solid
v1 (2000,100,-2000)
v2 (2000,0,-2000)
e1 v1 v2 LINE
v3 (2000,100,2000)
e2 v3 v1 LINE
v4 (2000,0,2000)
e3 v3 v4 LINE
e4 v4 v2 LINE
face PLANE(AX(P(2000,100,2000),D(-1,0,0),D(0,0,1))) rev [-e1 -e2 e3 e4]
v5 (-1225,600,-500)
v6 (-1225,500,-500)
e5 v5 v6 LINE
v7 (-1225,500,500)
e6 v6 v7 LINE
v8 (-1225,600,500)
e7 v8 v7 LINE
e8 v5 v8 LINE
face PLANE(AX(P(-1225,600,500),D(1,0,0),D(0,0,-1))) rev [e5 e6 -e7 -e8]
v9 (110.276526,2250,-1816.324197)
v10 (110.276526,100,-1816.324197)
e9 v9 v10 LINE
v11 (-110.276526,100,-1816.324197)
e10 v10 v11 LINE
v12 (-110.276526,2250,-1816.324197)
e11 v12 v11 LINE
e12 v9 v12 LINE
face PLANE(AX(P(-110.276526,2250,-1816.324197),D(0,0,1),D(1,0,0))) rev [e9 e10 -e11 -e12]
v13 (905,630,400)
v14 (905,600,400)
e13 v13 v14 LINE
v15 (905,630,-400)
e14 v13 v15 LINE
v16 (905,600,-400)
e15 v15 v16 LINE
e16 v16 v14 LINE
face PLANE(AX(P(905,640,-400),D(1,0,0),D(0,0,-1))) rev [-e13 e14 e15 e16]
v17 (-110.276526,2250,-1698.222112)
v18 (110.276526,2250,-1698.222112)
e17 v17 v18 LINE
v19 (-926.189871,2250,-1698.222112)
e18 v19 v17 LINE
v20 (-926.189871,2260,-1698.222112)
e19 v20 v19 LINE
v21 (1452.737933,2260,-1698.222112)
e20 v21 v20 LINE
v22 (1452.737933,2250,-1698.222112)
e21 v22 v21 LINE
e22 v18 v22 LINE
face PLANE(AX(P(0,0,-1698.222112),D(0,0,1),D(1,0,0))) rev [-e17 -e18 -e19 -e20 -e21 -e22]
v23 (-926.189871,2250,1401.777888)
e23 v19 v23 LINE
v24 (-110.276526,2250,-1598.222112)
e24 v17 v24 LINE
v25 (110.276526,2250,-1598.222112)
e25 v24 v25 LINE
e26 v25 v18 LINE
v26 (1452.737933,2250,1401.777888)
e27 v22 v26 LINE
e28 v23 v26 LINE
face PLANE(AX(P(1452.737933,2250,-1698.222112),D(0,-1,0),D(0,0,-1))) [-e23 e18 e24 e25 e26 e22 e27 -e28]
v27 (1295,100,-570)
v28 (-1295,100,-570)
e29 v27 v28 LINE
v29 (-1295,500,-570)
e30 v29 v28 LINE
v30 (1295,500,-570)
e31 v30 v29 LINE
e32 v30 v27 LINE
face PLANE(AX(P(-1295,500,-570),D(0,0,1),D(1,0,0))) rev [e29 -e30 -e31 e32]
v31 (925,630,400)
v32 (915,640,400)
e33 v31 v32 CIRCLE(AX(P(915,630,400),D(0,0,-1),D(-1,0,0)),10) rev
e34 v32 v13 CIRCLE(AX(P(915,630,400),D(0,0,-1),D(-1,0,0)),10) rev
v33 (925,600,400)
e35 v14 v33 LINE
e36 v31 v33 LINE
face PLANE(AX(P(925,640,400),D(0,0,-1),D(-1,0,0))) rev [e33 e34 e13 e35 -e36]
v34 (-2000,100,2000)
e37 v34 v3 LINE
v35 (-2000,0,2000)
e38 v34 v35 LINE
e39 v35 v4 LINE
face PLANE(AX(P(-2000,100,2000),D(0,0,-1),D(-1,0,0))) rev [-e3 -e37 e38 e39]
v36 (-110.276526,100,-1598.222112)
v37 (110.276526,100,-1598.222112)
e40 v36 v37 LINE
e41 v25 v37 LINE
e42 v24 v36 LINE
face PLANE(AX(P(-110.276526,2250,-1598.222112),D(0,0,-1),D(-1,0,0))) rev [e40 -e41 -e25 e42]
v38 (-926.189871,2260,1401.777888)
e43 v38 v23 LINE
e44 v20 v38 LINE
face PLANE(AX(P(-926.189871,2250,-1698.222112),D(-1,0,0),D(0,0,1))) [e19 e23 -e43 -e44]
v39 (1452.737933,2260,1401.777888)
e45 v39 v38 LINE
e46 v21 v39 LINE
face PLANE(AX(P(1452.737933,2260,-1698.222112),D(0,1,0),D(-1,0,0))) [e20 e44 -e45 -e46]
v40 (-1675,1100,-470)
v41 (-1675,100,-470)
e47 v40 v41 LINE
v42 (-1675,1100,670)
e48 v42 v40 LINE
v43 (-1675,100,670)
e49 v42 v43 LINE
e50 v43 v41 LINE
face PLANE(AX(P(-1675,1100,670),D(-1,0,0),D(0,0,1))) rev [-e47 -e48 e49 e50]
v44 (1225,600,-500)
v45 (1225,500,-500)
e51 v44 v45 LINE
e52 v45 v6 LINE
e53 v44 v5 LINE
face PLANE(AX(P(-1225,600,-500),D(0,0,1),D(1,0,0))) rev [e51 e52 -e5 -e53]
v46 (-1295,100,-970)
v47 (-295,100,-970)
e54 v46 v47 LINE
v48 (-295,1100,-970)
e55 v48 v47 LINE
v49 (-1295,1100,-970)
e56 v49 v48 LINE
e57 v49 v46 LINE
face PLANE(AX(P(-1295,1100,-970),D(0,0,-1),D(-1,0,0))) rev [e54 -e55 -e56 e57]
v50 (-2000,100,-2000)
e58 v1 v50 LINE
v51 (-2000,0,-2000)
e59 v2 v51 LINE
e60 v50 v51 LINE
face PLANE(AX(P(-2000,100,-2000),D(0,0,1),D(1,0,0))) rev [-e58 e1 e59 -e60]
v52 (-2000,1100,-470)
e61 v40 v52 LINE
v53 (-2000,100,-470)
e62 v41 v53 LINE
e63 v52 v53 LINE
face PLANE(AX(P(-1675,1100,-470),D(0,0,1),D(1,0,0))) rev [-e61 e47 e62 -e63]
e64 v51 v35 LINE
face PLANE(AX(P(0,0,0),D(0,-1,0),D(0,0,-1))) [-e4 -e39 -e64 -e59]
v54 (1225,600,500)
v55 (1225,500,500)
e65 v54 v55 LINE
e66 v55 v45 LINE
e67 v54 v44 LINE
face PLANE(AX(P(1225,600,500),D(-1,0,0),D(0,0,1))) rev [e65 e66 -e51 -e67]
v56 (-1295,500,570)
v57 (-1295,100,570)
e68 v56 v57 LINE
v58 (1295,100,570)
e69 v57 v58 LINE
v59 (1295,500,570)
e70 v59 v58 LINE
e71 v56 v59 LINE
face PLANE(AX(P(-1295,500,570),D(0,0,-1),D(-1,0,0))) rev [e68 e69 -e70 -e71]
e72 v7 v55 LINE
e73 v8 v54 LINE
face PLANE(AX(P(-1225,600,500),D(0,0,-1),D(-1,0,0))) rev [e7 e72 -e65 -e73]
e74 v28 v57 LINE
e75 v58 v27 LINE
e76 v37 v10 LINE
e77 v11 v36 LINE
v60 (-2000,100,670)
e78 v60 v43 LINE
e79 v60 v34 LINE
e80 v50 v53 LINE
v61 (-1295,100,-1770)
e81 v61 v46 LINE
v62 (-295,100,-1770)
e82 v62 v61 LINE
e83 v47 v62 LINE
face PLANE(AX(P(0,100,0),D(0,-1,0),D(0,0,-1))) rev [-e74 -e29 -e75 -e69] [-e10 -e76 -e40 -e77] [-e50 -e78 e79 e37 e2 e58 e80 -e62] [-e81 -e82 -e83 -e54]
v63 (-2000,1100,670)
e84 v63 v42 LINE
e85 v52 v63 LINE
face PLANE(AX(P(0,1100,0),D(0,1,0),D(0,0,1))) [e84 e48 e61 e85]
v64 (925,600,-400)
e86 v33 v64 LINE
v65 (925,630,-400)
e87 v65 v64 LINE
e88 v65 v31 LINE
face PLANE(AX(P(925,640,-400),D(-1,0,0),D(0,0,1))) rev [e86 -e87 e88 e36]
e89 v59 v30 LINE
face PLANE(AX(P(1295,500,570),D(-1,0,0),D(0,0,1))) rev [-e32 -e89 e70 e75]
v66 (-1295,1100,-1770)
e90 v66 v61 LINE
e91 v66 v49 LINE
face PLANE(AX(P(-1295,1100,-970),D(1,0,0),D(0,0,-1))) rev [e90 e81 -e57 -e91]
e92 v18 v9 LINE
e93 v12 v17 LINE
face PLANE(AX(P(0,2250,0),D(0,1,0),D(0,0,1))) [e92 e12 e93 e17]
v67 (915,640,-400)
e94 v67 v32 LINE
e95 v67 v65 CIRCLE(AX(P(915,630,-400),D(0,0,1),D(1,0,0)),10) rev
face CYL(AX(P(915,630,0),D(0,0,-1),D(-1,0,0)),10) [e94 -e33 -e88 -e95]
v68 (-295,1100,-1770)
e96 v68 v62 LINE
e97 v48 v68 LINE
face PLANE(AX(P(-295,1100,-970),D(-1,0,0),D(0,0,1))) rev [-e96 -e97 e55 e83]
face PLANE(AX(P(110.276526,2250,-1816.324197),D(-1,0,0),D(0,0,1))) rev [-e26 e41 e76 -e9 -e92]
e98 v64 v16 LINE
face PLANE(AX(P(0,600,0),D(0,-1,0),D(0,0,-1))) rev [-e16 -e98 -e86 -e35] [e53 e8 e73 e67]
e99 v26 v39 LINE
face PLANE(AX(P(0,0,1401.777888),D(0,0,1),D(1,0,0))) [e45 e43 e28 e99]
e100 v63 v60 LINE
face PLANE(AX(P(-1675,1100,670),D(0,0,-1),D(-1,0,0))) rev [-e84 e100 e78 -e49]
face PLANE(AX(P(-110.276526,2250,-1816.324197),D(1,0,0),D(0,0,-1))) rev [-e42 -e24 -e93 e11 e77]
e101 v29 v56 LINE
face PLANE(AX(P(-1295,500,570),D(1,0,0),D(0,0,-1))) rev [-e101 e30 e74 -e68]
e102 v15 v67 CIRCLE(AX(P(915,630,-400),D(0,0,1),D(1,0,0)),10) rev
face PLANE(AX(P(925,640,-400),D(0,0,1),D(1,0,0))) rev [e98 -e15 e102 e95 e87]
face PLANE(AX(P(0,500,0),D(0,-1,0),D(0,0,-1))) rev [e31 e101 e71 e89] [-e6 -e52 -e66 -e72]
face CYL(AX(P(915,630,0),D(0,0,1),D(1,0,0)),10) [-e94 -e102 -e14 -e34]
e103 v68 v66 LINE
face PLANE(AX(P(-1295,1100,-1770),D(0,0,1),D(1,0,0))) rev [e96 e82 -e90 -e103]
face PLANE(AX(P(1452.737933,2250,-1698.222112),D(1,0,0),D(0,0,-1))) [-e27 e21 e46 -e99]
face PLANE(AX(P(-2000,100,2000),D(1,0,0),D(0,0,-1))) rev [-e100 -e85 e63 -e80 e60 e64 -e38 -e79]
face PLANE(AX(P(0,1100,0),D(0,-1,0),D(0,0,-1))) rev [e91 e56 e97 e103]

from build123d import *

# Parameters (mm, degrees)
SKETCH1_W                = 4000
SKETCH1_H                = 4000
BOSS_EXTRUDE1_DEPTH      = 100
SKETCH2_W                = 2590
SKETCH2_H                = 1140
BOSS_EXTRUDE2_DEPTH      = 400
SKETCH3_W                = 2450
SKETCH3_H                = 1000
BOSS_EXTRUDE3_DEPTH      = 100
SKETCH4_W                = 1000
SKETCH4_H                = 800
SKETCH4_W_2              = 325
SKETCH4_H_2              = 1140
BOSS_EXTRUDE4_DEPTH      = 1000
SKETCH5_W                = 220.553052424
SKETCH5_H                = 218.102085328
BOSS_EXTRUDE5_DEPTH      = 2150
BOSS_EXTRUDE6_DEPTH      = 3000
BOSS_EXTRUDE6_DEPTH_BACK = 100
SKETCH6_W                = 2378.927803787
SKETCH6_H                = 10
SKETCH7_W                = 20
SKETCH7_H                = 800
BOSS_EXTRUDE7_DEPTH      = 40
FILLET1_R                = 10


with BuildPart() as part:
    # Sketch1 → Boss-Extrude1 (new body)
    with BuildSketch(Plane(origin=(0, 0, 0), x_dir=(1, 0, 0), z_dir=(0, 1, 0))):
        Rectangle(SKETCH1_W, SKETCH1_H)
    extrude(amount=BOSS_EXTRUDE1_DEPTH)

    # Sketch2 → Boss-Extrude2 (add)
    with BuildSketch(Plane(origin=(0, 100, 0), x_dir=(1, 0, 0), z_dir=(0, 1, 0))):
        Rectangle(SKETCH2_W, SKETCH2_H)
    extrude(amount=BOSS_EXTRUDE2_DEPTH)

    # Sketch3 → Boss-Extrude3 (add)
    with BuildSketch(Plane(origin=(0, 500, 0), x_dir=(1, 0, 0), z_dir=(0, 1, 0))):
        Rectangle(SKETCH3_W, SKETCH3_H)
    extrude(amount=BOSS_EXTRUDE3_DEPTH)

    # Sketch4 → Boss-Extrude4 (add)
    with BuildSketch(Plane(origin=(0, 100, 0), x_dir=(1, 0, 0), z_dir=(0, 1, 0))):
        with Locations((-795, 1370)):
            Rectangle(SKETCH4_W, SKETCH4_H)
        with Locations((-1837.5, -100)):
            Rectangle(SKETCH4_W_2, SKETCH4_H_2)
    extrude(amount=BOSS_EXTRUDE4_DEPTH)

    # Sketch5 → Boss-Extrude5 (add)
    with BuildSketch(Plane(origin=(0, 100, 0), x_dir=(1, 0, 0), z_dir=(0, 1, 0))):
        with Locations((0, 1707.273154618)):
            Rectangle(SKETCH5_W, SKETCH5_H)
    extrude(amount=BOSS_EXTRUDE5_DEPTH)

    # Sketch6 → Boss-Extrude6 (add, two sides: drawn at the far end of the back side and taken through both)
    with BuildSketch(Plane.XY.offset(-1598.222111954).offset(-BOSS_EXTRUDE6_DEPTH_BACK)):
        with Locations((263.274031351, 2255)):
            Rectangle(SKETCH6_W, SKETCH6_H)
    extrude(amount=BOSS_EXTRUDE6_DEPTH + BOSS_EXTRUDE6_DEPTH_BACK)

    # Sketch7 → Boss-Extrude7 (add)
    with BuildSketch(Plane(origin=(0, 600, 0), x_dir=(1, 0, 0), z_dir=(0, 1, 0))):
        with Locations((915, 0)):
            Rectangle(SKETCH7_W, SKETCH7_H)
    extrude(amount=BOSS_EXTRUDE7_DEPTH)

    # Fillet1
    fillet1_edges = [part.edges().sort_by_distance(p)[0] for p in [
        (925, 640, 0),
        (905, 640, 0),
    ]]
    fillet(fillet1_edges, radius=FILLET1_R - 0.0001)  # a hair under: the kernel refuses the full size


solid = part.part
